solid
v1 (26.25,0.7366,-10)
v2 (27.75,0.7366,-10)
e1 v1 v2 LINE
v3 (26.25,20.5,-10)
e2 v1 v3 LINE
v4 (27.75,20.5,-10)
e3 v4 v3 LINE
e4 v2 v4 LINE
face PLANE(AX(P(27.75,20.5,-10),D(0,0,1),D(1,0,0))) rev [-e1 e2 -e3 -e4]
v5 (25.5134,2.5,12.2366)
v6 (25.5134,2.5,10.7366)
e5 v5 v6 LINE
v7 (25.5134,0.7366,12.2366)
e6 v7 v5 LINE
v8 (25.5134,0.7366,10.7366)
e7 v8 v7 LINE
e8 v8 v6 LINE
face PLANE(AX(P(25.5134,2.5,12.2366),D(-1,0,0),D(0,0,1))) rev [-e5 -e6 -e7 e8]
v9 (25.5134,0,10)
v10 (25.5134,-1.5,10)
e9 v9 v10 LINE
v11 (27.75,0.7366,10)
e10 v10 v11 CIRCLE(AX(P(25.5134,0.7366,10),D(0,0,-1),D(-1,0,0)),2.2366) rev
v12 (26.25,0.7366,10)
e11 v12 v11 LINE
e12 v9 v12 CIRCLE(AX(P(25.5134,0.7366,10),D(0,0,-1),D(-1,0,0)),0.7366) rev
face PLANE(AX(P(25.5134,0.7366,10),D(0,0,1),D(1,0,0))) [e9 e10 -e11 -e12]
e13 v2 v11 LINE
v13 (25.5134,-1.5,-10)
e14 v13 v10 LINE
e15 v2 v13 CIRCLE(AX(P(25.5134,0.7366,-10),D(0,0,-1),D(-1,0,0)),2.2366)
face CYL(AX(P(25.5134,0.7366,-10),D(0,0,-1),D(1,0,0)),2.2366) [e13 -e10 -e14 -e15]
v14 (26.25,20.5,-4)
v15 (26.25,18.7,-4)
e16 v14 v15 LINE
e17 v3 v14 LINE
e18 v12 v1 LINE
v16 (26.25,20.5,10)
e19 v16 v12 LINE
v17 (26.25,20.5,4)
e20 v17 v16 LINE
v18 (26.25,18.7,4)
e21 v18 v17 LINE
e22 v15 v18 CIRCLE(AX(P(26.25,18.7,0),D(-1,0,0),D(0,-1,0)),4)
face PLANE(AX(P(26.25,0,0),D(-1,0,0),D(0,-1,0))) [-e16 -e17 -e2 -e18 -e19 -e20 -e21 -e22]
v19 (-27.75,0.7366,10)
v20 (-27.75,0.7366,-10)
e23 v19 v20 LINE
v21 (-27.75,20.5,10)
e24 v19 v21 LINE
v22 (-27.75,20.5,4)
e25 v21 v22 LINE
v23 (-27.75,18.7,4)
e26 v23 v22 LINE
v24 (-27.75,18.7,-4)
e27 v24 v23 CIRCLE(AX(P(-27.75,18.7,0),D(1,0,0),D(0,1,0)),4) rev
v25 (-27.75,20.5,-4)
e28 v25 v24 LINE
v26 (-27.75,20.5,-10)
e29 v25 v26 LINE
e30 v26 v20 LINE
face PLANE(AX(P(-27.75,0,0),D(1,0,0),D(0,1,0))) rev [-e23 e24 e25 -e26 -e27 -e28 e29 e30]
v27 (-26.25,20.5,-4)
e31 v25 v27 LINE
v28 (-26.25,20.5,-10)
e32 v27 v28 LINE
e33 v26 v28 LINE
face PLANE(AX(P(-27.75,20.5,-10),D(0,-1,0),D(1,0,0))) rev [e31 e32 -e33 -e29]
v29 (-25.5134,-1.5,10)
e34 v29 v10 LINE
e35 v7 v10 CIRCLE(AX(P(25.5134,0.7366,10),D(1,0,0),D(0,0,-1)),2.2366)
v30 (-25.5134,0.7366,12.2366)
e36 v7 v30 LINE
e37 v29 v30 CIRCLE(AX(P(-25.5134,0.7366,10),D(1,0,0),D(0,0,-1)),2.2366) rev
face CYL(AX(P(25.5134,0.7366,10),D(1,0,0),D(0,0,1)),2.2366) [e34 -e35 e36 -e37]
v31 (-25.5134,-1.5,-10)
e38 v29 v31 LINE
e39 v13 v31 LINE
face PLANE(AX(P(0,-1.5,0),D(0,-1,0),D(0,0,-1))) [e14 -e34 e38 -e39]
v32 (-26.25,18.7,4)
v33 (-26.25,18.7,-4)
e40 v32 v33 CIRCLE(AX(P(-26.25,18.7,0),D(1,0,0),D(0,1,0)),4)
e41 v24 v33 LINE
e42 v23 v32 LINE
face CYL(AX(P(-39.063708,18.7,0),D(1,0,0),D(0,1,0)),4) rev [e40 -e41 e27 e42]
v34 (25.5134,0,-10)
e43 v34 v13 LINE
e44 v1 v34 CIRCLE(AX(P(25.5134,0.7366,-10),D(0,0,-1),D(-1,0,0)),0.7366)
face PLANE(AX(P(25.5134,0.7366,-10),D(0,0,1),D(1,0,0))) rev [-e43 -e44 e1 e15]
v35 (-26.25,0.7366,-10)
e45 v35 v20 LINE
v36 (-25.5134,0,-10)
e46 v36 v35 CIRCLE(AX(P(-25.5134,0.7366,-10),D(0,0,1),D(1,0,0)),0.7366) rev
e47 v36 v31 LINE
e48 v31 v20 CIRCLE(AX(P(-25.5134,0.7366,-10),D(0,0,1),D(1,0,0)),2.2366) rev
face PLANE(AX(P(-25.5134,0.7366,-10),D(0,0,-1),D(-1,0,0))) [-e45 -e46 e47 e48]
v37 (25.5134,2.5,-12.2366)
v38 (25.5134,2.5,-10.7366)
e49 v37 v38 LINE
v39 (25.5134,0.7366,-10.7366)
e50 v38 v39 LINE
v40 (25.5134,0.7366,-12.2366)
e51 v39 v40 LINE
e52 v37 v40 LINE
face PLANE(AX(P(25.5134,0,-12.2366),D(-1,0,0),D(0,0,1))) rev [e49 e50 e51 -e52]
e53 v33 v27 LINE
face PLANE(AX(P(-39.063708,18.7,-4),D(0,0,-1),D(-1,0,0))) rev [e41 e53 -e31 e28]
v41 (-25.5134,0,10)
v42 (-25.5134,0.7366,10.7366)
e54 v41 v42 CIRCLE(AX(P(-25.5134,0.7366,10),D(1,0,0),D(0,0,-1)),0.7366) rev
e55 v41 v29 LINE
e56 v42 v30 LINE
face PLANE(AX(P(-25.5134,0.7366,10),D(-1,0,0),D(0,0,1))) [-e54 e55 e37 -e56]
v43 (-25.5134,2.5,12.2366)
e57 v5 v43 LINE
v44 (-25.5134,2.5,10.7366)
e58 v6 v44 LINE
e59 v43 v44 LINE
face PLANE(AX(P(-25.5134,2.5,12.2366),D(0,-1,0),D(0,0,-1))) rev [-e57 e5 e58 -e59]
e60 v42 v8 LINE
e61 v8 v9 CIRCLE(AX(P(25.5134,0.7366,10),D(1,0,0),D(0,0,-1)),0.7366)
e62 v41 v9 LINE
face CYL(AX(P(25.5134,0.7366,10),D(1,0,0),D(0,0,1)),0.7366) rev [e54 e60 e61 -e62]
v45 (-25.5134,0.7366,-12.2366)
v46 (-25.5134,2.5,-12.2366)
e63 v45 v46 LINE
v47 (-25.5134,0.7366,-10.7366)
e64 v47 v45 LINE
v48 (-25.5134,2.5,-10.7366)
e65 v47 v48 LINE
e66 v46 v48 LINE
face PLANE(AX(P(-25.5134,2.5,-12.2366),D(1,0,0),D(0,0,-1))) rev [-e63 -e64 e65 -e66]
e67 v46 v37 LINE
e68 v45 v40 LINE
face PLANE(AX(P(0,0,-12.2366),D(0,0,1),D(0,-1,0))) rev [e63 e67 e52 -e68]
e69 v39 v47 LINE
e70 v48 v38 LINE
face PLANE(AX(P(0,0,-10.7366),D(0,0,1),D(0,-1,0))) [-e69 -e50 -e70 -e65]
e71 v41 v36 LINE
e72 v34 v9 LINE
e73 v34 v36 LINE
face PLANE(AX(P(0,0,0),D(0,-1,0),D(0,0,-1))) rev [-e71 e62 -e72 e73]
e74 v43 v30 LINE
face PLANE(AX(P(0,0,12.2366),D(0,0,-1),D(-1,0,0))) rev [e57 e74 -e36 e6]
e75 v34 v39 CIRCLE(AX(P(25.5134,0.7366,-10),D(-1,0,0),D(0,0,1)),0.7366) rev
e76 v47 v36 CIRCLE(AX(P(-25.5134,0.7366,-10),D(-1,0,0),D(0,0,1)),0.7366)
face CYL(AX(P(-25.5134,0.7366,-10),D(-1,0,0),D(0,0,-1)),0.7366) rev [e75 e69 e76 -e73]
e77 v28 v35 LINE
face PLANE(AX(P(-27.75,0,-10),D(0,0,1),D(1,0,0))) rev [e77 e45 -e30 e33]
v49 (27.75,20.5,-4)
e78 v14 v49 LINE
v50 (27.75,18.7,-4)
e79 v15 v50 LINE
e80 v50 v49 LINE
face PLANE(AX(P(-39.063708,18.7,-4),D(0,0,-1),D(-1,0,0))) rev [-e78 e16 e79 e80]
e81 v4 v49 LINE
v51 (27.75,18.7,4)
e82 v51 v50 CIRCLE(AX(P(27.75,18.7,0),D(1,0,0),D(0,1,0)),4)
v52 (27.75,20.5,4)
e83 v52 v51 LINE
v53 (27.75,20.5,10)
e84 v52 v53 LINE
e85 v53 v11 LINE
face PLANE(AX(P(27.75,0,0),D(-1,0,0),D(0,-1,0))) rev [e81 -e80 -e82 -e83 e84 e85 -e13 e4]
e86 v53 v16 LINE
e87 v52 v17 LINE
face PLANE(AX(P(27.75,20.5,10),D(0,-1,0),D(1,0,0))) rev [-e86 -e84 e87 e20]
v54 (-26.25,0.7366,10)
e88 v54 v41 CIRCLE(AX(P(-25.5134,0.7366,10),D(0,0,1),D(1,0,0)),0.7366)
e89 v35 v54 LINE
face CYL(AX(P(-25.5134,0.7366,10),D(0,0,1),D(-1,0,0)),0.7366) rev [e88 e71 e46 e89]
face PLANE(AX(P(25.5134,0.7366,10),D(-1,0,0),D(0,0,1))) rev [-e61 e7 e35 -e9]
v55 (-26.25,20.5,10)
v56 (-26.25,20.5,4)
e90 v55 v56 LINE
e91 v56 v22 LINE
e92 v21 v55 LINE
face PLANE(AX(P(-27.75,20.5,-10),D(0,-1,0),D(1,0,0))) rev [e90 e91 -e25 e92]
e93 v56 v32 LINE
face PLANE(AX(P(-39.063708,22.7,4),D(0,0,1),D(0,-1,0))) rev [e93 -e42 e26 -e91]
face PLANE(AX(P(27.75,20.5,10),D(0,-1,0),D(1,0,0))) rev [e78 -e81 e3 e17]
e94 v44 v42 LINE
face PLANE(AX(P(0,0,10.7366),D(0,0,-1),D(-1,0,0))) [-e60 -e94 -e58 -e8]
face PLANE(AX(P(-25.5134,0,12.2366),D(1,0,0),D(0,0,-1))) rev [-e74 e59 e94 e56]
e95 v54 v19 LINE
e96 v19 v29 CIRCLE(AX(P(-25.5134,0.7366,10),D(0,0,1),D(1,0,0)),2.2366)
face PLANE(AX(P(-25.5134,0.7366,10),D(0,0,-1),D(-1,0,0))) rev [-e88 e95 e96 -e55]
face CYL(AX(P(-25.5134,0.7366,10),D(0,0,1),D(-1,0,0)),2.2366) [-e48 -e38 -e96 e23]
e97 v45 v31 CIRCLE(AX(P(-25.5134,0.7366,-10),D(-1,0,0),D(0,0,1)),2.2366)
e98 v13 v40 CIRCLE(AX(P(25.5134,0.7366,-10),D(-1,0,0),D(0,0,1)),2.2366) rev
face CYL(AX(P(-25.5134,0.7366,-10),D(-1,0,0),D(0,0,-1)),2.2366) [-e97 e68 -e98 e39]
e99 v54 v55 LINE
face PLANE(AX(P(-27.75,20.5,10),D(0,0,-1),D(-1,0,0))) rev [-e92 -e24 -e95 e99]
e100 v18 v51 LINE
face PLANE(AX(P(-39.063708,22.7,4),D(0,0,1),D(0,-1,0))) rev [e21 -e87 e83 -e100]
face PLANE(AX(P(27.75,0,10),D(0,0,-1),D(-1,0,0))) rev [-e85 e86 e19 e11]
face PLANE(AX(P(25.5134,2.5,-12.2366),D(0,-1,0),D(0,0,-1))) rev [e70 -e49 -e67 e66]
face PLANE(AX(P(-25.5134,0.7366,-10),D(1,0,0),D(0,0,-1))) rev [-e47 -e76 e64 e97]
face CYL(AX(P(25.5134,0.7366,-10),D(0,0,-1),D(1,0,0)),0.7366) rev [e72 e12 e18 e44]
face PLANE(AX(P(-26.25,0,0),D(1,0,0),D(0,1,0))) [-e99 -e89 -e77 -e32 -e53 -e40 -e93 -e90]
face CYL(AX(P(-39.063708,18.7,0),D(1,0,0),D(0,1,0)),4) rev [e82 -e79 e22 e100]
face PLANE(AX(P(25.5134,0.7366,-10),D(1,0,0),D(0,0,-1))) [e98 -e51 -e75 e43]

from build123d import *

# Parameters (mm, degrees)
CROQUIS3_W                         = 55.5
CROQUIS3_H                         = 20
BRIDA_BASE1_DEPTH                  = 1.5
BRIDA_DE_ARISTA1_STRIP_W           = 7.4732
BRIDA_DE_ARISTA1_STRIP_H           = 1.5
BRIDA_DE_ARISTA1_STRIP_CUT_DEPTH   = 20
BRIDA_DE_ARISTA1_STRIP_2_W         = 7.4732
BRIDA_DE_ARISTA1_STRIP_2_H         = 1.5
BRIDA_DE_ARISTA1_STRIP_CUT_2_DEPTH = 20
BRIDA_DE_ARISTA1_DEPTH             = 20
BRIDA_DE_ARISTA1_BEND_DEPTH        = 20
BRIDA_DE_ARISTA2_DEPTH             = 51.0268
BRIDA_DE_ARISTA2_BEND_DEPTH        = 51.0268
CORTAR_EXTRUIR1_REACH              = 62.417


# Sheet-metal steps are written as plain solids
with BuildPart() as part:
    # Croquis3 → Brida base1 (new body)
    with BuildSketch(Plane(origin=(0, 0, 0), x_dir=(1, 0, 0), z_dir=(0, 1, 0))):
        Rectangle(CROQUIS3_W, CROQUIS3_H)
    extrude(amount=-BRIDA_BASE1_DEPTH)

    # Brida de arista1 strip (across the edge) → Brida de arista1 strip cut (cut)
    with BuildSketch(Plane(origin=(-27.75, 0, -10), x_dir=(1, 0, 0), z_dir=(0, 0, 1))):
        with Locations((-1.5, -0.75)):
            Rectangle(BRIDA_DE_ARISTA1_STRIP_W, BRIDA_DE_ARISTA1_STRIP_H)
    extrude(amount=BRIDA_DE_ARISTA1_STRIP_CUT_DEPTH, mode=Mode.SUBTRACT)

    # Brida de arista1 strip 2 (across the edge) → Brida de arista1 strip cut 2 (cut)
    with BuildSketch(Plane(origin=(27.75, 0, 10), x_dir=(-1, 0, 0), z_dir=(0, 0, -1))):
        with Locations((-1.5, -0.75)):
            Rectangle(BRIDA_DE_ARISTA1_STRIP_2_W, BRIDA_DE_ARISTA1_STRIP_2_H)
    extrude(amount=BRIDA_DE_ARISTA1_STRIP_CUT_2_DEPTH, mode=Mode.SUBTRACT)

    # Brida de arista1 section (across the edge) → Brida de arista1 (add)
    with BuildSketch(Plane(origin=(-27.75, 0, -10), x_dir=(1, 0, 0), z_dir=(0, 0, 1))):
        with BuildLine():
            Line((0, 0.7366), (0, 20.5))
            Line((0, 20.5), (1.5, 20.5))
            Line((1.5, 20.5), (1.5, 0.7366))
            ThreePointArc((1.5, 0.7366), (1.715745145, 0.215745145), (2.2366, 0))
            Line((2.2366, 0), (2.2366, -1.5))
            ThreePointArc((2.2366, -1.5), (0.655084973, -0.844915027), (0, 0.7366))
        make_face()
    extrude(amount=BRIDA_DE_ARISTA1_DEPTH)

    # Brida de arista1 section 2 (across the edge) → Brida de arista1 bend (add)
    with BuildSketch(Plane(origin=(27.75, 0, 10), x_dir=(-1, 0, 0), z_dir=(0, 0, -1))):
        with BuildLine():
            Line((0, 0.7366), (0, 20.5))
            Line((0, 20.5), (1.5, 20.5))
            Line((1.5, 20.5), (1.5, 0.7366))
            ThreePointArc((1.5, 0.7366), (1.715745145, 0.215745145), (2.2366, 0))
            Line((2.2366, 0), (2.2366, -1.5))
            ThreePointArc((2.2366, -1.5), (0.655084973, -0.844915027), (0, 0.7366))
        make_face()
    extrude(amount=BRIDA_DE_ARISTA1_BEND_DEPTH)

    # Brida de arista2 section (across the edge) → Brida de arista2 (add)
    with BuildSketch(Plane(origin=(-25.5134, 0, 10.7366), x_dir=(0, 0, -1), z_dir=(1, 0, 0))):
        with BuildLine():
            Line((-1.5, 0.7366), (-1.5, 2.5))
            Line((-1.5, 2.5), (0, 2.5))
            Line((0, 2.5), (0, 0.7366))
            ThreePointArc((0, 0.7366), (0.215745145, 0.215745145), (0.7366, 0))
            Line((0.7366, 0), (0.7366, -1.5))
            ThreePointArc((0.7366, -1.5), (-0.844915027, -0.844915027), (-1.5, 0.7366))
        make_face()
    extrude(amount=BRIDA_DE_ARISTA2_DEPTH)

    # Brida de arista2 section 2 (across the edge) → Brida de arista2 bend (add)
    with BuildSketch(Plane(origin=(25.5134, 0, -10.7366), x_dir=(0, 0, 1), z_dir=(-1, 0, 0))):
        with BuildLine():
            Line((-1.5, 0.7366), (-1.5, 2.5))
            Line((-1.5, 2.5), (0, 2.5))
            Line((0, 2.5), (0, 0.7366))
            ThreePointArc((0, 0.7366), (0.215745145, 0.215745145), (0.7366, 0))
            Line((0.7366, 0), (0.7366, -1.5))
            ThreePointArc((0.7366, -1.5), (-0.844915027, -0.844915027), (-1.5, 0.7366))
        make_face()
    extrude(amount=BRIDA_DE_ARISTA2_BEND_DEPTH)

    # Cortar-Extruir1: up to this face of the body (flat: up to its plane)
    cortar_extruir1_end = Plane(part.part.faces().sort_by_distance((-27.75, 10.6183, 0))[0])
    # Croquis20 → Cortar-Extruir1 (cut, up to the picked face)
    with BuildSketch(Plane(origin=(27.75, 0, 0), x_dir=(0, 0, -1), z_dir=(1, 0, 0)), mode=Mode.PRIVATE) as cortar_extruir1_sk1:
        with BuildLine():
            Line((4, 18.7), (4, 22.7))
            Line((4, 22.7), (-4, 22.7))
            Line((-4, 22.7), (-4, 18.7))
            ThreePointArc((-4, 18.7), (0, 14.7), (4, 18.7))
        make_face()
    cortar_extruir1_tool1 = split(extrude(cortar_extruir1_sk1.sketch, amount=-CORTAR_EXTRUIR1_REACH, mode=Mode.PRIVATE), bisect_by=cortar_extruir1_end, keep=Keep.BOTH, mode=Mode.PRIVATE)
    add(cortar_extruir1_tool1.solids().sort_by(Axis((27.75, 19.073399, 0), (-1, 0, 0)))[0], mode=Mode.SUBTRACT)


solid = part.part
